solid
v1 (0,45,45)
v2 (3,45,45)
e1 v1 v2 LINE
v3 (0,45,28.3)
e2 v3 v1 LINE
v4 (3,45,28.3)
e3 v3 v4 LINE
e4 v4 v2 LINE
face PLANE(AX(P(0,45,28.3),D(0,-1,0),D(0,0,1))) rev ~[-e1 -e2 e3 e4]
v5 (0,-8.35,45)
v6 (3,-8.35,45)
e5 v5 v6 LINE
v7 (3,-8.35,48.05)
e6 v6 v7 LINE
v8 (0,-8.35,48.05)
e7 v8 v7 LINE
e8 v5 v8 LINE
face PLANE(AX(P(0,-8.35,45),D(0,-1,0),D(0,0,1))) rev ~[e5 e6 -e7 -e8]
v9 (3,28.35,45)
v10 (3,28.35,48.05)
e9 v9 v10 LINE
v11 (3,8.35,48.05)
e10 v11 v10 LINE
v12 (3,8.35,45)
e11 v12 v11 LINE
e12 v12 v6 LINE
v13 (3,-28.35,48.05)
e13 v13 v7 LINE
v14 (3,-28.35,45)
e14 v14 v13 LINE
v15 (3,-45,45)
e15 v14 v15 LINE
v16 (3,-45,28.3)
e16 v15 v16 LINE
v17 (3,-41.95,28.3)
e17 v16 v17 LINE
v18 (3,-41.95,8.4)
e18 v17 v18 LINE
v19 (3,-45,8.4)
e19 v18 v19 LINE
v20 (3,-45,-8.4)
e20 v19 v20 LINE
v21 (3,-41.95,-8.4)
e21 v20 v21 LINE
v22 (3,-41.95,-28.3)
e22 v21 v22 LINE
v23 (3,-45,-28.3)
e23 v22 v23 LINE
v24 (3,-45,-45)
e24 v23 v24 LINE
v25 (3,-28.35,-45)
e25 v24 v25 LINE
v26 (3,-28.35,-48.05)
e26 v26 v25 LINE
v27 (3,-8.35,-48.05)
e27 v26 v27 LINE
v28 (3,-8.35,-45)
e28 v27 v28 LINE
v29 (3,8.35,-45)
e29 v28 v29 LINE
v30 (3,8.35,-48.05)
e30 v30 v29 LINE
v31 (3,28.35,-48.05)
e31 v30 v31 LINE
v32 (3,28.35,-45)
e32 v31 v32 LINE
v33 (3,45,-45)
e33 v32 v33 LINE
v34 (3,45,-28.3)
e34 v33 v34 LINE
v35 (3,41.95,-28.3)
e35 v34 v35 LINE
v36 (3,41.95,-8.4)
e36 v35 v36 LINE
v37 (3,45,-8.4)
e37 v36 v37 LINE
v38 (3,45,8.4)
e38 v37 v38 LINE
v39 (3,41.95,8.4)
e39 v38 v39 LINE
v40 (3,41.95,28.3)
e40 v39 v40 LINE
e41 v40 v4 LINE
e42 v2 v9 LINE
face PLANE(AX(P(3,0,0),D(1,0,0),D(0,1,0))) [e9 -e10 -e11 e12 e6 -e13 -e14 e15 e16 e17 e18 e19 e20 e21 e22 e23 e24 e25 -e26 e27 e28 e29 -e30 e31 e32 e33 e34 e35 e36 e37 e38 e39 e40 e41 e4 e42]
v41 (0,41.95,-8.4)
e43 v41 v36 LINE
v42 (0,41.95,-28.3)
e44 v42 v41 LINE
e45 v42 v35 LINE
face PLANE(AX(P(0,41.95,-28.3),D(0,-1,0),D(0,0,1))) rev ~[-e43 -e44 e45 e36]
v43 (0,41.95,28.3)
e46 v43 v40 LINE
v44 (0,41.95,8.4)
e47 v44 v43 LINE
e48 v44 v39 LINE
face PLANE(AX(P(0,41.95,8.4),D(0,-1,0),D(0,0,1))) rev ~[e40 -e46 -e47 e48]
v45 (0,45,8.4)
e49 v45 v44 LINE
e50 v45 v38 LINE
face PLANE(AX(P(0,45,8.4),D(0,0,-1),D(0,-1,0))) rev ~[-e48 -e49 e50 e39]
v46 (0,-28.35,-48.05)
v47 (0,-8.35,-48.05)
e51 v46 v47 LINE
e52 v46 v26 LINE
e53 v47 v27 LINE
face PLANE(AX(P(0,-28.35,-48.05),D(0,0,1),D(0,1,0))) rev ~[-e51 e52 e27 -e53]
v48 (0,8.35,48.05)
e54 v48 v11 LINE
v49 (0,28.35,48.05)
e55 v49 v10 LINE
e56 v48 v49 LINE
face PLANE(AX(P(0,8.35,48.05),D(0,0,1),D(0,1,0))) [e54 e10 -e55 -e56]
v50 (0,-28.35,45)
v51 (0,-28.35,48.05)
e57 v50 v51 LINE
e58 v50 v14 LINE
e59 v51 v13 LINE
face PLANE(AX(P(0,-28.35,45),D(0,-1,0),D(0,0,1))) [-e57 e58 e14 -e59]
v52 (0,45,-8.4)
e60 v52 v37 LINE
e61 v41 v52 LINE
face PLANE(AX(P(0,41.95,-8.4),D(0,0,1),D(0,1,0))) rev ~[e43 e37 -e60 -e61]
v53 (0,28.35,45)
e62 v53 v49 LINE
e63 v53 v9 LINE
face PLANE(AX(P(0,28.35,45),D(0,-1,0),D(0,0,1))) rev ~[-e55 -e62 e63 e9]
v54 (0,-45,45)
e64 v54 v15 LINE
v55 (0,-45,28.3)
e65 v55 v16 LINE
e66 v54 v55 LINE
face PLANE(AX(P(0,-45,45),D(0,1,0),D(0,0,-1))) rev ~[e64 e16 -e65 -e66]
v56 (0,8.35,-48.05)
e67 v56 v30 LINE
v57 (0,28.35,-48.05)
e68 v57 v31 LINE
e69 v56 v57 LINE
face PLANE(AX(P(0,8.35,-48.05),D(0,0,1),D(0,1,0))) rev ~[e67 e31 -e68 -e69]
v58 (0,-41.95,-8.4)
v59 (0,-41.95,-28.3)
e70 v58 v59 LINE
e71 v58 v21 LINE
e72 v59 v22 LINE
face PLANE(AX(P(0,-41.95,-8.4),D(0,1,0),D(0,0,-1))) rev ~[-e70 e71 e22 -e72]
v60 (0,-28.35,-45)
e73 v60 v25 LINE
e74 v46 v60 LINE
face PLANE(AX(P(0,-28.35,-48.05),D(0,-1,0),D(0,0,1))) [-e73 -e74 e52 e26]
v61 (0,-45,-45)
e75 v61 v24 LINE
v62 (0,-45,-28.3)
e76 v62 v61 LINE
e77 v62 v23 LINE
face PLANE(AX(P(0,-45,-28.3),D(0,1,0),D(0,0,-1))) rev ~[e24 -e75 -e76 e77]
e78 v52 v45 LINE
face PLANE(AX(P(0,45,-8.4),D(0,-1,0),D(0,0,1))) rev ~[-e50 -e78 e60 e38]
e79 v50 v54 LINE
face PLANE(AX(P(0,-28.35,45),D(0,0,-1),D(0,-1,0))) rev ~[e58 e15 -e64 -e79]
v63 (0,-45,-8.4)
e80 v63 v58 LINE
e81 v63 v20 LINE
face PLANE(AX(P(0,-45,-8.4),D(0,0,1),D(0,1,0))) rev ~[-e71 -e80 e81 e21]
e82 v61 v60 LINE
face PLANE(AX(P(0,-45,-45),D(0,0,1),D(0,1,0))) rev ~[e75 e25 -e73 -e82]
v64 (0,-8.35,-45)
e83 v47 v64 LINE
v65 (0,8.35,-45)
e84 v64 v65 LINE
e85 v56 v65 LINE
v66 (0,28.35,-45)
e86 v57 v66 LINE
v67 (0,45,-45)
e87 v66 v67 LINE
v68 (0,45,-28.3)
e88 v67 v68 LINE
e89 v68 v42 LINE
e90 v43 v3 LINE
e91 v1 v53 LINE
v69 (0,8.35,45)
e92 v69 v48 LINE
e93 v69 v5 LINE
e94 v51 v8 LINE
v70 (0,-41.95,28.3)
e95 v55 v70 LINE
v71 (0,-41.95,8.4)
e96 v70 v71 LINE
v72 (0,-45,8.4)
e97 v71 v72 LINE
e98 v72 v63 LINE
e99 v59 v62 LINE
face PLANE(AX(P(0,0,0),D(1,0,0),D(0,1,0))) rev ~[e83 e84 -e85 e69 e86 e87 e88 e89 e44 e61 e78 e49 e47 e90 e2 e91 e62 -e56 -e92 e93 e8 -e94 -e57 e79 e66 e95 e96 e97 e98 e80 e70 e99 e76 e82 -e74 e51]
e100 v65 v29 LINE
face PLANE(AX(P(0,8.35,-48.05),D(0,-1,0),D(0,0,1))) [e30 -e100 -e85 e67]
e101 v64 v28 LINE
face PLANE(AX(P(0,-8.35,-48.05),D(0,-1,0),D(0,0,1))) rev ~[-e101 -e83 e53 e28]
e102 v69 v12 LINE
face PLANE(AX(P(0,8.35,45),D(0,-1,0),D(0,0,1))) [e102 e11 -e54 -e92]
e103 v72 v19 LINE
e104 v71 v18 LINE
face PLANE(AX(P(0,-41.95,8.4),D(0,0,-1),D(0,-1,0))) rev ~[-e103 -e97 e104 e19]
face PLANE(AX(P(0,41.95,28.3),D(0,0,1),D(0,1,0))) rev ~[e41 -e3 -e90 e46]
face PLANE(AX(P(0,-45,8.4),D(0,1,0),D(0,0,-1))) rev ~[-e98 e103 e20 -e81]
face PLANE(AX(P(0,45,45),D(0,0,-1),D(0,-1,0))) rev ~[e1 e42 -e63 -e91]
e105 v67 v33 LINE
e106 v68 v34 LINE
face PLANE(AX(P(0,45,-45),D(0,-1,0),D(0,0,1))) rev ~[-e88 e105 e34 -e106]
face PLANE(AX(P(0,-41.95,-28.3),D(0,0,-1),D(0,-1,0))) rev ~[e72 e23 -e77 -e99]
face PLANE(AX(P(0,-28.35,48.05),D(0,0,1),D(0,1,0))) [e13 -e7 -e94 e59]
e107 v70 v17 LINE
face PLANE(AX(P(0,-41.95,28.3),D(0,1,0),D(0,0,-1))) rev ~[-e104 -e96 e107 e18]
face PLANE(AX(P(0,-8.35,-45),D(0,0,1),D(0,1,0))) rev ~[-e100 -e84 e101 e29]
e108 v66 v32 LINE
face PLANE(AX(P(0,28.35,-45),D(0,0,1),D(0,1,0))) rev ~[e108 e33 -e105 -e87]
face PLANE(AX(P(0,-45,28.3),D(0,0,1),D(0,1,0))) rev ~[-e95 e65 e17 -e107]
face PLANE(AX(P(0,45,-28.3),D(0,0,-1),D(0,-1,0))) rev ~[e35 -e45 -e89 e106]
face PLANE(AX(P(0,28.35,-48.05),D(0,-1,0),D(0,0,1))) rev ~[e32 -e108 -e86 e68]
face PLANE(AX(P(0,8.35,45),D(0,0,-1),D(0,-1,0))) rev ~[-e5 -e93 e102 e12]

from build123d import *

# Parameters (mm, degrees)
F0_W     = 20
F0_H     = 3.05
F1_DEPTH = 3


# Not quite as in the source:
# - a feature names something its author has since deleted; it is built from what else it names


with BuildPart() as f1:
    # F0 (on Right) → F1 (new body)
    with BuildSketch(Plane.YZ):
        Polygon((28.35, -45), (45, -45), (45, -28.3), (41.95, -28.3), (41.95, -8.4), (45, -8.4), (45, 8.4), (41.95, 8.4), (41.95, 28.3), (45, 28.3), (45, 45), (28.35, 45), (8.35, 45), (-8.35, 45), (-28.35, 45), (-45, 45), (-45, 28.3), (-41.95, 28.3), (-41.95, 8.4), (-45, 8.4), (-45, -8.4), (-41.95, -8.4), (-41.95, -28.3), (-45, -28.3), (-45, -45), (-28.35, -45), (-8.35, -45), (8.35, -45), align=None)
        with Locations((-18.35, -46.525)):
            Rectangle(F0_W, F0_H)
        with Locations((18.35, -46.525)):
            Rectangle(F0_W, F0_H)
        with Locations((18.35, 46.525)):
            Rectangle(F0_W, F0_H)
        with Locations((-18.35, 46.525)):
            Rectangle(F0_W, F0_H)
    extrude(amount=F1_DEPTH)


solid = f1.part
